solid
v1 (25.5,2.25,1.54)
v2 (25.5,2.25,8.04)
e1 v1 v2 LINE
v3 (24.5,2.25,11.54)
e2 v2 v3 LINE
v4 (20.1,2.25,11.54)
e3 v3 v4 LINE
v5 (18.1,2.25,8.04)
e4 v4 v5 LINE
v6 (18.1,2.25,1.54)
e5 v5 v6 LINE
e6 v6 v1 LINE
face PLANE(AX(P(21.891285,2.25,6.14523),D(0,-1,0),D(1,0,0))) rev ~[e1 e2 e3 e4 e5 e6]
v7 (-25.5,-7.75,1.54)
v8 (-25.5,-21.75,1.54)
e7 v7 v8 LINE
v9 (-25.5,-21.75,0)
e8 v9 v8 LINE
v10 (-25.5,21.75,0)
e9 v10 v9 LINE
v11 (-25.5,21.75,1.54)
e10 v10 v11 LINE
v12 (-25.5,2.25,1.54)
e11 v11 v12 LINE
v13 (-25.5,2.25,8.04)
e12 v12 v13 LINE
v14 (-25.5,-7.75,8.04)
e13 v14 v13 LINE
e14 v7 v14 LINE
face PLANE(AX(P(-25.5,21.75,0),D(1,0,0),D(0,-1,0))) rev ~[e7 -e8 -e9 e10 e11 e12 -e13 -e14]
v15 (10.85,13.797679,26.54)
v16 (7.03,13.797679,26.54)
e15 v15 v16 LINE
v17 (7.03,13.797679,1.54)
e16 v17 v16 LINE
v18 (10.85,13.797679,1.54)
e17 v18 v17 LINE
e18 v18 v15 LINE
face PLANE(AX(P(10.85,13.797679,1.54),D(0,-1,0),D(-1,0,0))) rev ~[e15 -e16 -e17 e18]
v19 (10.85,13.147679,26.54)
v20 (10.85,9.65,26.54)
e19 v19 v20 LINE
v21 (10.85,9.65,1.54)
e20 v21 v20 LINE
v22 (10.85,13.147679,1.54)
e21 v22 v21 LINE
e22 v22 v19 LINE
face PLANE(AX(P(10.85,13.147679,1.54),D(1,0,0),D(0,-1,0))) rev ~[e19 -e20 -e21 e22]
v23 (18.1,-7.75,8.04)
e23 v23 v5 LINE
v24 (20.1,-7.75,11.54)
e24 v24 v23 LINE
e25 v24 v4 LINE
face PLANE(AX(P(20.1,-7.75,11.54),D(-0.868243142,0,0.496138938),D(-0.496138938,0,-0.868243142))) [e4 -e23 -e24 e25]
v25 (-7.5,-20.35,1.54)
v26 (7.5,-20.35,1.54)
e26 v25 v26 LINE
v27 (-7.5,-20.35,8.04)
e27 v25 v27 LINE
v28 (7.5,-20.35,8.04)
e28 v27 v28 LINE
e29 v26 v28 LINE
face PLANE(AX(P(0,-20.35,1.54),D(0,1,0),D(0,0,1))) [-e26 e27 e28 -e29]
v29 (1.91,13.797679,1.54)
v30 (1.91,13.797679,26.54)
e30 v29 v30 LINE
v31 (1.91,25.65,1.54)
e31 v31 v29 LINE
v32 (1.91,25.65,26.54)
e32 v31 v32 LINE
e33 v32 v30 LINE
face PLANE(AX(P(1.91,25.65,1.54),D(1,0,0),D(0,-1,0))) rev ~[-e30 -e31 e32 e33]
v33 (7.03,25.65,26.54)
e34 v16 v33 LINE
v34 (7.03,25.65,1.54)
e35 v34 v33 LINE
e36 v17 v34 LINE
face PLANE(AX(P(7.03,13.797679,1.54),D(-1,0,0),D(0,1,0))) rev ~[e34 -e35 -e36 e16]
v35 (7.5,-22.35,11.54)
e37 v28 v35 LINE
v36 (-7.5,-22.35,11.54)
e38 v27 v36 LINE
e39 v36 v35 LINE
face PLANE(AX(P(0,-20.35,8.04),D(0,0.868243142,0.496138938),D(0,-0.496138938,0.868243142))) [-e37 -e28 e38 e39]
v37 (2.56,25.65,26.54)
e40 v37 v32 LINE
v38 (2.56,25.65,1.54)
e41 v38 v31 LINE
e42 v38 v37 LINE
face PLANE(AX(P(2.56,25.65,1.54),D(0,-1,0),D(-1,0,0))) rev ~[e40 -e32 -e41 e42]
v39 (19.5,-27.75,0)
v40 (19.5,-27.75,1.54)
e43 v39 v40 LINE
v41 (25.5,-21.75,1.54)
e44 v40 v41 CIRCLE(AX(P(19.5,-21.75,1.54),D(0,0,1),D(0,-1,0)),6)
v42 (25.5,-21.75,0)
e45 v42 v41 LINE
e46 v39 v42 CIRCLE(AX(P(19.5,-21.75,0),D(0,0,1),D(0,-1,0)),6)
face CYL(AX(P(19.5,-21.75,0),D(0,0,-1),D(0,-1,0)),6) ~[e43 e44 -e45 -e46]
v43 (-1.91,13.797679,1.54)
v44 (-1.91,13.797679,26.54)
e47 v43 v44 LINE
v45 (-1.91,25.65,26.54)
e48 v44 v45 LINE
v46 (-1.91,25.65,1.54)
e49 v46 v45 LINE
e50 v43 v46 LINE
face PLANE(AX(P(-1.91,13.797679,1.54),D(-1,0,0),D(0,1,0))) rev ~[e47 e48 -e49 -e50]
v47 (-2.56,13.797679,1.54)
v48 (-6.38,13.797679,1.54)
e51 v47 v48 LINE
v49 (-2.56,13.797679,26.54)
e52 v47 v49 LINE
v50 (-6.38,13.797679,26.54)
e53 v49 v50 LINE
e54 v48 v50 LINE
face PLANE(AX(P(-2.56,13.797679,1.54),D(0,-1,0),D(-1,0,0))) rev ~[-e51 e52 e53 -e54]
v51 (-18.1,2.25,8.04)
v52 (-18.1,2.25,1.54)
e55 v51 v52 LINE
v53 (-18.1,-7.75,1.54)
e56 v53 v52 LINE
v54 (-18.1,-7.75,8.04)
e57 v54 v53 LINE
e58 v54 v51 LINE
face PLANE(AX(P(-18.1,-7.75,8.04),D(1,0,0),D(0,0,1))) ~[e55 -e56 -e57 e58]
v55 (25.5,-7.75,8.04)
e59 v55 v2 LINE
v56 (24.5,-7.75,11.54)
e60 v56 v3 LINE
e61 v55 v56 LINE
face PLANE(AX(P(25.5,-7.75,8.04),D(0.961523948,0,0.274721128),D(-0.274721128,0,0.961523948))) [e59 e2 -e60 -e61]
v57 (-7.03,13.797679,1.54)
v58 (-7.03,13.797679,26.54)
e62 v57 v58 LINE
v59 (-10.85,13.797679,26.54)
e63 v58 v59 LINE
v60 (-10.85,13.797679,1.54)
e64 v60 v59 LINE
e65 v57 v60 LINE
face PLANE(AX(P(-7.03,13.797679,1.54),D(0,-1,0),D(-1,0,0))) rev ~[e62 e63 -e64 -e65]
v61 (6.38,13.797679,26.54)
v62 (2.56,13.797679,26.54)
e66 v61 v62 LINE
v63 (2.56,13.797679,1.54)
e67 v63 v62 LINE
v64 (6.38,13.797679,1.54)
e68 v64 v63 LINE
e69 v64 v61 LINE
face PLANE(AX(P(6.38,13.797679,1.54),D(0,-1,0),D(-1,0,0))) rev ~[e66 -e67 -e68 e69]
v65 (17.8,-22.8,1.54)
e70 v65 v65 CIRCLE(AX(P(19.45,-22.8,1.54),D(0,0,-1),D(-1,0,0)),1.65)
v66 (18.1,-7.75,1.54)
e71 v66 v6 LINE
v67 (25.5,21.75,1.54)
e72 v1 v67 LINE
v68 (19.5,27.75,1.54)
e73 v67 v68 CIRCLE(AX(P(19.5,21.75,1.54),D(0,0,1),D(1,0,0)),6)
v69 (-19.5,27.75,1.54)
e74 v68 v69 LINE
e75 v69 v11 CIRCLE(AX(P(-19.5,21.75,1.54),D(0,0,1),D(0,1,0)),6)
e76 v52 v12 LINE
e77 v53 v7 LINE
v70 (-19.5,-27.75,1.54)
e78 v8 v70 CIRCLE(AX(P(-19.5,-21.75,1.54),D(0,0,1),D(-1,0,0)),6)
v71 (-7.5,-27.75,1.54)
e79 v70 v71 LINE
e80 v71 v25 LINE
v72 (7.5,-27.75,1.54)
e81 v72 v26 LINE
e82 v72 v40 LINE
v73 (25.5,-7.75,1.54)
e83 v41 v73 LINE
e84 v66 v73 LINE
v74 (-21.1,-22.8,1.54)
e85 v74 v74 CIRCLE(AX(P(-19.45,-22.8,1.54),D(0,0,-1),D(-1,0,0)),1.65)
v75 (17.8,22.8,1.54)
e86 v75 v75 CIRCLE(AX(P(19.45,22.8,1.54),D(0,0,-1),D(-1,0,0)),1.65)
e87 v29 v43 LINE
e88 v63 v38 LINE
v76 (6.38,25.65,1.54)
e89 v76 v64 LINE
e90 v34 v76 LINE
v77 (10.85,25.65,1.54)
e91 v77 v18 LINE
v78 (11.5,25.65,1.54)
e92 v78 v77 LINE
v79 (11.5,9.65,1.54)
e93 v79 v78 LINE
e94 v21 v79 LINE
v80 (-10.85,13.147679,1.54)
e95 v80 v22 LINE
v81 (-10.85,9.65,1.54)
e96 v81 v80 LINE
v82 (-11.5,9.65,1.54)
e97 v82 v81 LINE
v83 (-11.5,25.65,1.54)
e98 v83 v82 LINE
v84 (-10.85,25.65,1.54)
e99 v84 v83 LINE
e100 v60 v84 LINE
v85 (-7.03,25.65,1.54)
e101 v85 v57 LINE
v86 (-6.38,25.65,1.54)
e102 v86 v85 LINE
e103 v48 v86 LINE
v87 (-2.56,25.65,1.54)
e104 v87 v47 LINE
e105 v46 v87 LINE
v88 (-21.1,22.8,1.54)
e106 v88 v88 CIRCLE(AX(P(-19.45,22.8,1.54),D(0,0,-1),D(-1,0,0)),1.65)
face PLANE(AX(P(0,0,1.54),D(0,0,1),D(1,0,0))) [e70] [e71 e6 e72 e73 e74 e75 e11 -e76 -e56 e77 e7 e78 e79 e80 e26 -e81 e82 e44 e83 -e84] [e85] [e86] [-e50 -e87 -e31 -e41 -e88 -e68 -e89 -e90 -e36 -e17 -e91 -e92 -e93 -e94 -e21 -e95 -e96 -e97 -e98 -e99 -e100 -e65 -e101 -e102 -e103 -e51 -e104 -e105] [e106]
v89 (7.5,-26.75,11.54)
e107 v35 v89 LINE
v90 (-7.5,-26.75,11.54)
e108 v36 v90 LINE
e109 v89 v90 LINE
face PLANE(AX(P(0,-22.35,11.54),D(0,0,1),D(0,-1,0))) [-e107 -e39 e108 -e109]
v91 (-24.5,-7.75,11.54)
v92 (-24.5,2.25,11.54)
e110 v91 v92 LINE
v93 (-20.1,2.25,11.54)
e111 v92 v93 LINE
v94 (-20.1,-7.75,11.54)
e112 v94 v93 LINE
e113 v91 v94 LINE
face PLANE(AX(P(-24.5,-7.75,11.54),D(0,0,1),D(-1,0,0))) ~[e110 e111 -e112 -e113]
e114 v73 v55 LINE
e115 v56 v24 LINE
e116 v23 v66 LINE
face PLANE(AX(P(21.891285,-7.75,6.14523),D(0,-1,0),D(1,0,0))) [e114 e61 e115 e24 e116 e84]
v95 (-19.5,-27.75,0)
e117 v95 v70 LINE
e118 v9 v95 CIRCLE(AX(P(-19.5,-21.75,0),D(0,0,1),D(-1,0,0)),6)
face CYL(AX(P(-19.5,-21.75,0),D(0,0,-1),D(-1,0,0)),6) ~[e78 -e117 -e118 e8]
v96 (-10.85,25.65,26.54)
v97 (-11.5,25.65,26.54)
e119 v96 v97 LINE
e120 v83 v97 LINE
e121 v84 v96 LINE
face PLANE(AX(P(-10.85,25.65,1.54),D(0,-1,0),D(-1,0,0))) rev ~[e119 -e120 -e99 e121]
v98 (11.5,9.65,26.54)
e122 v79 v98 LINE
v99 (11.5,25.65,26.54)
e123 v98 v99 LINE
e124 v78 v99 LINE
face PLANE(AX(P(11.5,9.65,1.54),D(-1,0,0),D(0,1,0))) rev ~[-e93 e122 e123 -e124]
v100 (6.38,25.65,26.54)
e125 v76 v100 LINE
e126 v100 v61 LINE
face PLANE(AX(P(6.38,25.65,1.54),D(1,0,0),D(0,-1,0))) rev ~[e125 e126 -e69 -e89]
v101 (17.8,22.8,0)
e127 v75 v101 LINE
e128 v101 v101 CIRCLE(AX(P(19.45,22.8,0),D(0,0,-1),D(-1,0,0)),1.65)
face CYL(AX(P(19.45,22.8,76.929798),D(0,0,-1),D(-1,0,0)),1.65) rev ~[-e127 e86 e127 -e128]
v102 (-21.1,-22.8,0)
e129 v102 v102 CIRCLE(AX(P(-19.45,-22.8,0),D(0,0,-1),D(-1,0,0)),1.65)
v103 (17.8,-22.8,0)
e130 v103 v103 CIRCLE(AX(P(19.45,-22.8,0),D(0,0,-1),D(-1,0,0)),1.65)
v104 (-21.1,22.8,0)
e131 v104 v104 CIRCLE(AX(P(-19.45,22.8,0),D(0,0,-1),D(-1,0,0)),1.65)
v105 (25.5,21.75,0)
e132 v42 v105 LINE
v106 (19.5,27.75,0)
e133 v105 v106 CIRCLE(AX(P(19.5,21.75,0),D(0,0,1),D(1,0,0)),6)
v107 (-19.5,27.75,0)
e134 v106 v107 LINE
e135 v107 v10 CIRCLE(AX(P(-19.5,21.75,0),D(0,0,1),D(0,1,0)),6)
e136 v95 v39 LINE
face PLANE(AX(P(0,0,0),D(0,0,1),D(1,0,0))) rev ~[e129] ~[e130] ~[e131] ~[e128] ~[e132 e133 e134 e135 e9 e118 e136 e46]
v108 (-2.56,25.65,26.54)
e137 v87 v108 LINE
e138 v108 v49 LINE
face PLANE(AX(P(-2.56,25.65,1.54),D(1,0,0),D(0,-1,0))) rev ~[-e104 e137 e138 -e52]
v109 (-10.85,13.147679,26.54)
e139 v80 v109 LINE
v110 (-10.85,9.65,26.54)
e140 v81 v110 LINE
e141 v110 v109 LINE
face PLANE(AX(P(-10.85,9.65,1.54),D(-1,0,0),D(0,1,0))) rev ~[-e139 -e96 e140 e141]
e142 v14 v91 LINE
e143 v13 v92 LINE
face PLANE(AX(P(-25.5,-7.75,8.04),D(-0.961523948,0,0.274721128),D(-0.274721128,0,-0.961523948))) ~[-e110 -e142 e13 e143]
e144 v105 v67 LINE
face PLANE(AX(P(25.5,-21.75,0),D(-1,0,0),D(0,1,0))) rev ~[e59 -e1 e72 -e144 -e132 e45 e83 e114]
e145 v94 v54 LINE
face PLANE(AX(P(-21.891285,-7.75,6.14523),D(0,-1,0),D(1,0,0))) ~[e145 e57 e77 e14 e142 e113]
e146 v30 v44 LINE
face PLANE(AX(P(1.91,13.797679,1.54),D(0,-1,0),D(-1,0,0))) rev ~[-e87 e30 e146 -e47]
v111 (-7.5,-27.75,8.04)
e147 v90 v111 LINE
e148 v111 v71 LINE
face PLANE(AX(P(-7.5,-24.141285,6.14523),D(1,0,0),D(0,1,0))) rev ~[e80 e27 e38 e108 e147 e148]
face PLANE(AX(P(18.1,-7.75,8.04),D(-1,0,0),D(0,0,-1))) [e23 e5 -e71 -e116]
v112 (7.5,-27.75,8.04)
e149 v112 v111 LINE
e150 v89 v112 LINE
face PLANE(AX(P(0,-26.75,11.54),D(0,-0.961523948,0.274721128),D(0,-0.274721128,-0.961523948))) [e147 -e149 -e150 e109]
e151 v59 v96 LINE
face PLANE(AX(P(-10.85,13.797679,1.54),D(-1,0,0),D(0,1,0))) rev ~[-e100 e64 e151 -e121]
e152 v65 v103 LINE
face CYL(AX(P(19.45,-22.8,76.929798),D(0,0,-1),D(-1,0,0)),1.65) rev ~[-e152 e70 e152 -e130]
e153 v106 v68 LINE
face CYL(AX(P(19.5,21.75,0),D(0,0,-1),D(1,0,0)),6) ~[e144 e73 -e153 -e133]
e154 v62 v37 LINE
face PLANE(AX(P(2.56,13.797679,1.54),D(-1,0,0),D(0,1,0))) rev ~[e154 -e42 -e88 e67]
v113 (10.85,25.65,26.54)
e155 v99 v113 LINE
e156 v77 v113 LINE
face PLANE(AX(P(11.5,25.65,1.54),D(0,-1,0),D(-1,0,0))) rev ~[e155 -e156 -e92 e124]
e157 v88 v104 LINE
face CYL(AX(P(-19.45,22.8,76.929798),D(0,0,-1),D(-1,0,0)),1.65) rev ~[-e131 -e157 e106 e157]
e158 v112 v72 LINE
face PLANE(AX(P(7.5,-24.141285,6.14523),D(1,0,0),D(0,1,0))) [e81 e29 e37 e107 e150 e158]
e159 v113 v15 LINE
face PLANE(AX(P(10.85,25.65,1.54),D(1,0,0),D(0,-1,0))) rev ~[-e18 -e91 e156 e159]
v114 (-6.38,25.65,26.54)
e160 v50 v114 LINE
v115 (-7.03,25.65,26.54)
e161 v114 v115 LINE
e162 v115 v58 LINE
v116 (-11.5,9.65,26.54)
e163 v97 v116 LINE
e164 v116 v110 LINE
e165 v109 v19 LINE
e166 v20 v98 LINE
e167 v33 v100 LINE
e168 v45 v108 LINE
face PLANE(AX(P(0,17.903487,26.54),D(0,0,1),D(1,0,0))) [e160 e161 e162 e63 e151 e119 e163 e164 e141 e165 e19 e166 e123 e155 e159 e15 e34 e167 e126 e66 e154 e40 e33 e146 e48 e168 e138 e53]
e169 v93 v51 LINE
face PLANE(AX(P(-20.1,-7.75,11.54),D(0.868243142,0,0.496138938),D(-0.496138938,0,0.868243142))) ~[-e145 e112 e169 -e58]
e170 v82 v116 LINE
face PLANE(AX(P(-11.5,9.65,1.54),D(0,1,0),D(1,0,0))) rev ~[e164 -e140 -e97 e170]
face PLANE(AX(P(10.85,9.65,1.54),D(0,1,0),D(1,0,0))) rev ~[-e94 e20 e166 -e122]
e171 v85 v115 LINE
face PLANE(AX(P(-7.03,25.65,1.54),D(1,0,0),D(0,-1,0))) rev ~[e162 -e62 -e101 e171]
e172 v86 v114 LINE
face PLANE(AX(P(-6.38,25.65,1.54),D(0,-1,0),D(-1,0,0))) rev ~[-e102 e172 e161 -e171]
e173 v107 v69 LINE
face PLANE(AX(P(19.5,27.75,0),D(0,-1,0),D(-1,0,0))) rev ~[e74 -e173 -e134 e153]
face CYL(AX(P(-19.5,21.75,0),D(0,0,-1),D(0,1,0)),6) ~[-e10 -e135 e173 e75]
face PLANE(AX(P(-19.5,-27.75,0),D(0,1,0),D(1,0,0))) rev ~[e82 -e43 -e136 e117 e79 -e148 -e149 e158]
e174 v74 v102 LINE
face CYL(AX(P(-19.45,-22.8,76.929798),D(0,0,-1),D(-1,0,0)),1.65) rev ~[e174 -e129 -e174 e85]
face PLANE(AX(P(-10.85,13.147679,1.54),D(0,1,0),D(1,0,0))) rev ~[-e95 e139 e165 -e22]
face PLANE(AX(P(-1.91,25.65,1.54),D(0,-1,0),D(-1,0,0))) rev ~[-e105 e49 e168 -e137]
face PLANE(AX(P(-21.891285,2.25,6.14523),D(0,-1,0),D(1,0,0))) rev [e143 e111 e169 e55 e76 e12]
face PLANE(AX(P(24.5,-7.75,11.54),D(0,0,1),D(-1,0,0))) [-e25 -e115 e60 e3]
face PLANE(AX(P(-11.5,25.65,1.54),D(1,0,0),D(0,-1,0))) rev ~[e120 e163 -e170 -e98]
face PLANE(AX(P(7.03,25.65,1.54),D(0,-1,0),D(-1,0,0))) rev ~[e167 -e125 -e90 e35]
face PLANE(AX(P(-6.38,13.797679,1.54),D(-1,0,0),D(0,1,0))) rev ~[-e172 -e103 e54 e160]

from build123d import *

# Parameters (mm, degrees)
F1_DEPTH  = 1.54
F3_D      = 3.3
F5_DEPTH  = 25
F8_DEPTH  = 10
F10_DEPTH = 7.5


# Not quite as in the source:
# - a pattern or mirror of a feature is missing from the dataset's text; its kind, count and spacing are read off the source's solid


with BuildPart() as f1:
    # F0 (on Top) → F1 (new body)
    with BuildSketch(Plane.XY):
        with BuildLine():
            Line((-19.5, -27.75), (19.5, -27.75))
            ThreePointArc((19.5, -27.75), (23.7426406871, -25.9926406871), (25.5, -21.75))
            Line((25.5, -21.75), (25.5, 21.75))
            ThreePointArc((25.5, 21.75), (23.7426406871, 25.9926406871), (19.5, 27.75))
            Line((19.5, 27.75), (-19.5, 27.75))
            ThreePointArc((-19.5, 27.75), (-23.7426406871, 25.9926406871), (-25.5, 21.75))
            Line((-25.5, 21.75), (-25.5, -21.75))
            ThreePointArc((-25.5, -21.75), (-23.7426406871, -25.9926406871), (-19.5, -27.75))
        make_face()
    extrude(amount=F1_DEPTH)

    # F3 (through all)
    with Locations(Plane.XY.offset(1.54)):
        with Locations((-19.45, 22.8), (19.45, 22.8), (-19.45, -22.8), (19.45, -22.8)):
            Hole(F3_D / 2)

    # F4 (on face) → F5 (join)
    with BuildSketch(Plane.XY.offset(1.54)):
        Polygon((10.85, 9.65), (11.5, 9.65), (11.5, 25.65), (10.85, 25.65), (10.85, 13.7976789847), (7.03, 13.7976789847), (7.03, 25.65), (6.38, 25.65), (6.38, 13.7976789847), (2.56, 13.7976789847), (2.56, 25.65), (1.91, 25.65), (1.91, 13.7976789847), (-1.91, 13.7976789847), (-1.91, 25.65), (-2.56, 25.65), (-2.56, 13.7976789847), (-6.38, 13.7976789847), (-6.38, 25.65), (-7.03, 25.65), (-7.03, 13.7976789847), (-10.85, 13.7976789847), (-10.85, 25.65), (-11.5, 25.65), (-11.5, 9.65), (-10.85, 9.65), (-10.85, 13.1476789847), (10.85, 13.1476789847), align=None)
    extrude(amount=F5_DEPTH)

    # F7 (on offset) → F8 (join)
    with BuildSketch(Plane.XZ.offset(7.75)):
        Polygon((18.1, 1.54), (25.5, 1.54), (25.5, 8.04), (24.5, 11.54), (20.1, 11.54), (18.1, 8.04), align=None)
    f8 = extrude(amount=-F8_DEPTH)

    # F8_copies: F8 across plane
    add(f8.mirror(Plane(origin=(0, 0, 0), x_dir=(0, 0, -1), z_dir=(-1, 0, 0))))

    # F9 (on Right) → F10 (join, symmetric)
    with BuildSketch(Plane.YZ):
        Polygon((-27.75, 1.54), (-20.35, 1.54), (-20.35, 8.04), (-22.35, 11.54), (-26.75, 11.54), (-27.75, 8.04), align=None)
    extrude(amount=F10_DEPTH, both=True)


solid = f1.part
